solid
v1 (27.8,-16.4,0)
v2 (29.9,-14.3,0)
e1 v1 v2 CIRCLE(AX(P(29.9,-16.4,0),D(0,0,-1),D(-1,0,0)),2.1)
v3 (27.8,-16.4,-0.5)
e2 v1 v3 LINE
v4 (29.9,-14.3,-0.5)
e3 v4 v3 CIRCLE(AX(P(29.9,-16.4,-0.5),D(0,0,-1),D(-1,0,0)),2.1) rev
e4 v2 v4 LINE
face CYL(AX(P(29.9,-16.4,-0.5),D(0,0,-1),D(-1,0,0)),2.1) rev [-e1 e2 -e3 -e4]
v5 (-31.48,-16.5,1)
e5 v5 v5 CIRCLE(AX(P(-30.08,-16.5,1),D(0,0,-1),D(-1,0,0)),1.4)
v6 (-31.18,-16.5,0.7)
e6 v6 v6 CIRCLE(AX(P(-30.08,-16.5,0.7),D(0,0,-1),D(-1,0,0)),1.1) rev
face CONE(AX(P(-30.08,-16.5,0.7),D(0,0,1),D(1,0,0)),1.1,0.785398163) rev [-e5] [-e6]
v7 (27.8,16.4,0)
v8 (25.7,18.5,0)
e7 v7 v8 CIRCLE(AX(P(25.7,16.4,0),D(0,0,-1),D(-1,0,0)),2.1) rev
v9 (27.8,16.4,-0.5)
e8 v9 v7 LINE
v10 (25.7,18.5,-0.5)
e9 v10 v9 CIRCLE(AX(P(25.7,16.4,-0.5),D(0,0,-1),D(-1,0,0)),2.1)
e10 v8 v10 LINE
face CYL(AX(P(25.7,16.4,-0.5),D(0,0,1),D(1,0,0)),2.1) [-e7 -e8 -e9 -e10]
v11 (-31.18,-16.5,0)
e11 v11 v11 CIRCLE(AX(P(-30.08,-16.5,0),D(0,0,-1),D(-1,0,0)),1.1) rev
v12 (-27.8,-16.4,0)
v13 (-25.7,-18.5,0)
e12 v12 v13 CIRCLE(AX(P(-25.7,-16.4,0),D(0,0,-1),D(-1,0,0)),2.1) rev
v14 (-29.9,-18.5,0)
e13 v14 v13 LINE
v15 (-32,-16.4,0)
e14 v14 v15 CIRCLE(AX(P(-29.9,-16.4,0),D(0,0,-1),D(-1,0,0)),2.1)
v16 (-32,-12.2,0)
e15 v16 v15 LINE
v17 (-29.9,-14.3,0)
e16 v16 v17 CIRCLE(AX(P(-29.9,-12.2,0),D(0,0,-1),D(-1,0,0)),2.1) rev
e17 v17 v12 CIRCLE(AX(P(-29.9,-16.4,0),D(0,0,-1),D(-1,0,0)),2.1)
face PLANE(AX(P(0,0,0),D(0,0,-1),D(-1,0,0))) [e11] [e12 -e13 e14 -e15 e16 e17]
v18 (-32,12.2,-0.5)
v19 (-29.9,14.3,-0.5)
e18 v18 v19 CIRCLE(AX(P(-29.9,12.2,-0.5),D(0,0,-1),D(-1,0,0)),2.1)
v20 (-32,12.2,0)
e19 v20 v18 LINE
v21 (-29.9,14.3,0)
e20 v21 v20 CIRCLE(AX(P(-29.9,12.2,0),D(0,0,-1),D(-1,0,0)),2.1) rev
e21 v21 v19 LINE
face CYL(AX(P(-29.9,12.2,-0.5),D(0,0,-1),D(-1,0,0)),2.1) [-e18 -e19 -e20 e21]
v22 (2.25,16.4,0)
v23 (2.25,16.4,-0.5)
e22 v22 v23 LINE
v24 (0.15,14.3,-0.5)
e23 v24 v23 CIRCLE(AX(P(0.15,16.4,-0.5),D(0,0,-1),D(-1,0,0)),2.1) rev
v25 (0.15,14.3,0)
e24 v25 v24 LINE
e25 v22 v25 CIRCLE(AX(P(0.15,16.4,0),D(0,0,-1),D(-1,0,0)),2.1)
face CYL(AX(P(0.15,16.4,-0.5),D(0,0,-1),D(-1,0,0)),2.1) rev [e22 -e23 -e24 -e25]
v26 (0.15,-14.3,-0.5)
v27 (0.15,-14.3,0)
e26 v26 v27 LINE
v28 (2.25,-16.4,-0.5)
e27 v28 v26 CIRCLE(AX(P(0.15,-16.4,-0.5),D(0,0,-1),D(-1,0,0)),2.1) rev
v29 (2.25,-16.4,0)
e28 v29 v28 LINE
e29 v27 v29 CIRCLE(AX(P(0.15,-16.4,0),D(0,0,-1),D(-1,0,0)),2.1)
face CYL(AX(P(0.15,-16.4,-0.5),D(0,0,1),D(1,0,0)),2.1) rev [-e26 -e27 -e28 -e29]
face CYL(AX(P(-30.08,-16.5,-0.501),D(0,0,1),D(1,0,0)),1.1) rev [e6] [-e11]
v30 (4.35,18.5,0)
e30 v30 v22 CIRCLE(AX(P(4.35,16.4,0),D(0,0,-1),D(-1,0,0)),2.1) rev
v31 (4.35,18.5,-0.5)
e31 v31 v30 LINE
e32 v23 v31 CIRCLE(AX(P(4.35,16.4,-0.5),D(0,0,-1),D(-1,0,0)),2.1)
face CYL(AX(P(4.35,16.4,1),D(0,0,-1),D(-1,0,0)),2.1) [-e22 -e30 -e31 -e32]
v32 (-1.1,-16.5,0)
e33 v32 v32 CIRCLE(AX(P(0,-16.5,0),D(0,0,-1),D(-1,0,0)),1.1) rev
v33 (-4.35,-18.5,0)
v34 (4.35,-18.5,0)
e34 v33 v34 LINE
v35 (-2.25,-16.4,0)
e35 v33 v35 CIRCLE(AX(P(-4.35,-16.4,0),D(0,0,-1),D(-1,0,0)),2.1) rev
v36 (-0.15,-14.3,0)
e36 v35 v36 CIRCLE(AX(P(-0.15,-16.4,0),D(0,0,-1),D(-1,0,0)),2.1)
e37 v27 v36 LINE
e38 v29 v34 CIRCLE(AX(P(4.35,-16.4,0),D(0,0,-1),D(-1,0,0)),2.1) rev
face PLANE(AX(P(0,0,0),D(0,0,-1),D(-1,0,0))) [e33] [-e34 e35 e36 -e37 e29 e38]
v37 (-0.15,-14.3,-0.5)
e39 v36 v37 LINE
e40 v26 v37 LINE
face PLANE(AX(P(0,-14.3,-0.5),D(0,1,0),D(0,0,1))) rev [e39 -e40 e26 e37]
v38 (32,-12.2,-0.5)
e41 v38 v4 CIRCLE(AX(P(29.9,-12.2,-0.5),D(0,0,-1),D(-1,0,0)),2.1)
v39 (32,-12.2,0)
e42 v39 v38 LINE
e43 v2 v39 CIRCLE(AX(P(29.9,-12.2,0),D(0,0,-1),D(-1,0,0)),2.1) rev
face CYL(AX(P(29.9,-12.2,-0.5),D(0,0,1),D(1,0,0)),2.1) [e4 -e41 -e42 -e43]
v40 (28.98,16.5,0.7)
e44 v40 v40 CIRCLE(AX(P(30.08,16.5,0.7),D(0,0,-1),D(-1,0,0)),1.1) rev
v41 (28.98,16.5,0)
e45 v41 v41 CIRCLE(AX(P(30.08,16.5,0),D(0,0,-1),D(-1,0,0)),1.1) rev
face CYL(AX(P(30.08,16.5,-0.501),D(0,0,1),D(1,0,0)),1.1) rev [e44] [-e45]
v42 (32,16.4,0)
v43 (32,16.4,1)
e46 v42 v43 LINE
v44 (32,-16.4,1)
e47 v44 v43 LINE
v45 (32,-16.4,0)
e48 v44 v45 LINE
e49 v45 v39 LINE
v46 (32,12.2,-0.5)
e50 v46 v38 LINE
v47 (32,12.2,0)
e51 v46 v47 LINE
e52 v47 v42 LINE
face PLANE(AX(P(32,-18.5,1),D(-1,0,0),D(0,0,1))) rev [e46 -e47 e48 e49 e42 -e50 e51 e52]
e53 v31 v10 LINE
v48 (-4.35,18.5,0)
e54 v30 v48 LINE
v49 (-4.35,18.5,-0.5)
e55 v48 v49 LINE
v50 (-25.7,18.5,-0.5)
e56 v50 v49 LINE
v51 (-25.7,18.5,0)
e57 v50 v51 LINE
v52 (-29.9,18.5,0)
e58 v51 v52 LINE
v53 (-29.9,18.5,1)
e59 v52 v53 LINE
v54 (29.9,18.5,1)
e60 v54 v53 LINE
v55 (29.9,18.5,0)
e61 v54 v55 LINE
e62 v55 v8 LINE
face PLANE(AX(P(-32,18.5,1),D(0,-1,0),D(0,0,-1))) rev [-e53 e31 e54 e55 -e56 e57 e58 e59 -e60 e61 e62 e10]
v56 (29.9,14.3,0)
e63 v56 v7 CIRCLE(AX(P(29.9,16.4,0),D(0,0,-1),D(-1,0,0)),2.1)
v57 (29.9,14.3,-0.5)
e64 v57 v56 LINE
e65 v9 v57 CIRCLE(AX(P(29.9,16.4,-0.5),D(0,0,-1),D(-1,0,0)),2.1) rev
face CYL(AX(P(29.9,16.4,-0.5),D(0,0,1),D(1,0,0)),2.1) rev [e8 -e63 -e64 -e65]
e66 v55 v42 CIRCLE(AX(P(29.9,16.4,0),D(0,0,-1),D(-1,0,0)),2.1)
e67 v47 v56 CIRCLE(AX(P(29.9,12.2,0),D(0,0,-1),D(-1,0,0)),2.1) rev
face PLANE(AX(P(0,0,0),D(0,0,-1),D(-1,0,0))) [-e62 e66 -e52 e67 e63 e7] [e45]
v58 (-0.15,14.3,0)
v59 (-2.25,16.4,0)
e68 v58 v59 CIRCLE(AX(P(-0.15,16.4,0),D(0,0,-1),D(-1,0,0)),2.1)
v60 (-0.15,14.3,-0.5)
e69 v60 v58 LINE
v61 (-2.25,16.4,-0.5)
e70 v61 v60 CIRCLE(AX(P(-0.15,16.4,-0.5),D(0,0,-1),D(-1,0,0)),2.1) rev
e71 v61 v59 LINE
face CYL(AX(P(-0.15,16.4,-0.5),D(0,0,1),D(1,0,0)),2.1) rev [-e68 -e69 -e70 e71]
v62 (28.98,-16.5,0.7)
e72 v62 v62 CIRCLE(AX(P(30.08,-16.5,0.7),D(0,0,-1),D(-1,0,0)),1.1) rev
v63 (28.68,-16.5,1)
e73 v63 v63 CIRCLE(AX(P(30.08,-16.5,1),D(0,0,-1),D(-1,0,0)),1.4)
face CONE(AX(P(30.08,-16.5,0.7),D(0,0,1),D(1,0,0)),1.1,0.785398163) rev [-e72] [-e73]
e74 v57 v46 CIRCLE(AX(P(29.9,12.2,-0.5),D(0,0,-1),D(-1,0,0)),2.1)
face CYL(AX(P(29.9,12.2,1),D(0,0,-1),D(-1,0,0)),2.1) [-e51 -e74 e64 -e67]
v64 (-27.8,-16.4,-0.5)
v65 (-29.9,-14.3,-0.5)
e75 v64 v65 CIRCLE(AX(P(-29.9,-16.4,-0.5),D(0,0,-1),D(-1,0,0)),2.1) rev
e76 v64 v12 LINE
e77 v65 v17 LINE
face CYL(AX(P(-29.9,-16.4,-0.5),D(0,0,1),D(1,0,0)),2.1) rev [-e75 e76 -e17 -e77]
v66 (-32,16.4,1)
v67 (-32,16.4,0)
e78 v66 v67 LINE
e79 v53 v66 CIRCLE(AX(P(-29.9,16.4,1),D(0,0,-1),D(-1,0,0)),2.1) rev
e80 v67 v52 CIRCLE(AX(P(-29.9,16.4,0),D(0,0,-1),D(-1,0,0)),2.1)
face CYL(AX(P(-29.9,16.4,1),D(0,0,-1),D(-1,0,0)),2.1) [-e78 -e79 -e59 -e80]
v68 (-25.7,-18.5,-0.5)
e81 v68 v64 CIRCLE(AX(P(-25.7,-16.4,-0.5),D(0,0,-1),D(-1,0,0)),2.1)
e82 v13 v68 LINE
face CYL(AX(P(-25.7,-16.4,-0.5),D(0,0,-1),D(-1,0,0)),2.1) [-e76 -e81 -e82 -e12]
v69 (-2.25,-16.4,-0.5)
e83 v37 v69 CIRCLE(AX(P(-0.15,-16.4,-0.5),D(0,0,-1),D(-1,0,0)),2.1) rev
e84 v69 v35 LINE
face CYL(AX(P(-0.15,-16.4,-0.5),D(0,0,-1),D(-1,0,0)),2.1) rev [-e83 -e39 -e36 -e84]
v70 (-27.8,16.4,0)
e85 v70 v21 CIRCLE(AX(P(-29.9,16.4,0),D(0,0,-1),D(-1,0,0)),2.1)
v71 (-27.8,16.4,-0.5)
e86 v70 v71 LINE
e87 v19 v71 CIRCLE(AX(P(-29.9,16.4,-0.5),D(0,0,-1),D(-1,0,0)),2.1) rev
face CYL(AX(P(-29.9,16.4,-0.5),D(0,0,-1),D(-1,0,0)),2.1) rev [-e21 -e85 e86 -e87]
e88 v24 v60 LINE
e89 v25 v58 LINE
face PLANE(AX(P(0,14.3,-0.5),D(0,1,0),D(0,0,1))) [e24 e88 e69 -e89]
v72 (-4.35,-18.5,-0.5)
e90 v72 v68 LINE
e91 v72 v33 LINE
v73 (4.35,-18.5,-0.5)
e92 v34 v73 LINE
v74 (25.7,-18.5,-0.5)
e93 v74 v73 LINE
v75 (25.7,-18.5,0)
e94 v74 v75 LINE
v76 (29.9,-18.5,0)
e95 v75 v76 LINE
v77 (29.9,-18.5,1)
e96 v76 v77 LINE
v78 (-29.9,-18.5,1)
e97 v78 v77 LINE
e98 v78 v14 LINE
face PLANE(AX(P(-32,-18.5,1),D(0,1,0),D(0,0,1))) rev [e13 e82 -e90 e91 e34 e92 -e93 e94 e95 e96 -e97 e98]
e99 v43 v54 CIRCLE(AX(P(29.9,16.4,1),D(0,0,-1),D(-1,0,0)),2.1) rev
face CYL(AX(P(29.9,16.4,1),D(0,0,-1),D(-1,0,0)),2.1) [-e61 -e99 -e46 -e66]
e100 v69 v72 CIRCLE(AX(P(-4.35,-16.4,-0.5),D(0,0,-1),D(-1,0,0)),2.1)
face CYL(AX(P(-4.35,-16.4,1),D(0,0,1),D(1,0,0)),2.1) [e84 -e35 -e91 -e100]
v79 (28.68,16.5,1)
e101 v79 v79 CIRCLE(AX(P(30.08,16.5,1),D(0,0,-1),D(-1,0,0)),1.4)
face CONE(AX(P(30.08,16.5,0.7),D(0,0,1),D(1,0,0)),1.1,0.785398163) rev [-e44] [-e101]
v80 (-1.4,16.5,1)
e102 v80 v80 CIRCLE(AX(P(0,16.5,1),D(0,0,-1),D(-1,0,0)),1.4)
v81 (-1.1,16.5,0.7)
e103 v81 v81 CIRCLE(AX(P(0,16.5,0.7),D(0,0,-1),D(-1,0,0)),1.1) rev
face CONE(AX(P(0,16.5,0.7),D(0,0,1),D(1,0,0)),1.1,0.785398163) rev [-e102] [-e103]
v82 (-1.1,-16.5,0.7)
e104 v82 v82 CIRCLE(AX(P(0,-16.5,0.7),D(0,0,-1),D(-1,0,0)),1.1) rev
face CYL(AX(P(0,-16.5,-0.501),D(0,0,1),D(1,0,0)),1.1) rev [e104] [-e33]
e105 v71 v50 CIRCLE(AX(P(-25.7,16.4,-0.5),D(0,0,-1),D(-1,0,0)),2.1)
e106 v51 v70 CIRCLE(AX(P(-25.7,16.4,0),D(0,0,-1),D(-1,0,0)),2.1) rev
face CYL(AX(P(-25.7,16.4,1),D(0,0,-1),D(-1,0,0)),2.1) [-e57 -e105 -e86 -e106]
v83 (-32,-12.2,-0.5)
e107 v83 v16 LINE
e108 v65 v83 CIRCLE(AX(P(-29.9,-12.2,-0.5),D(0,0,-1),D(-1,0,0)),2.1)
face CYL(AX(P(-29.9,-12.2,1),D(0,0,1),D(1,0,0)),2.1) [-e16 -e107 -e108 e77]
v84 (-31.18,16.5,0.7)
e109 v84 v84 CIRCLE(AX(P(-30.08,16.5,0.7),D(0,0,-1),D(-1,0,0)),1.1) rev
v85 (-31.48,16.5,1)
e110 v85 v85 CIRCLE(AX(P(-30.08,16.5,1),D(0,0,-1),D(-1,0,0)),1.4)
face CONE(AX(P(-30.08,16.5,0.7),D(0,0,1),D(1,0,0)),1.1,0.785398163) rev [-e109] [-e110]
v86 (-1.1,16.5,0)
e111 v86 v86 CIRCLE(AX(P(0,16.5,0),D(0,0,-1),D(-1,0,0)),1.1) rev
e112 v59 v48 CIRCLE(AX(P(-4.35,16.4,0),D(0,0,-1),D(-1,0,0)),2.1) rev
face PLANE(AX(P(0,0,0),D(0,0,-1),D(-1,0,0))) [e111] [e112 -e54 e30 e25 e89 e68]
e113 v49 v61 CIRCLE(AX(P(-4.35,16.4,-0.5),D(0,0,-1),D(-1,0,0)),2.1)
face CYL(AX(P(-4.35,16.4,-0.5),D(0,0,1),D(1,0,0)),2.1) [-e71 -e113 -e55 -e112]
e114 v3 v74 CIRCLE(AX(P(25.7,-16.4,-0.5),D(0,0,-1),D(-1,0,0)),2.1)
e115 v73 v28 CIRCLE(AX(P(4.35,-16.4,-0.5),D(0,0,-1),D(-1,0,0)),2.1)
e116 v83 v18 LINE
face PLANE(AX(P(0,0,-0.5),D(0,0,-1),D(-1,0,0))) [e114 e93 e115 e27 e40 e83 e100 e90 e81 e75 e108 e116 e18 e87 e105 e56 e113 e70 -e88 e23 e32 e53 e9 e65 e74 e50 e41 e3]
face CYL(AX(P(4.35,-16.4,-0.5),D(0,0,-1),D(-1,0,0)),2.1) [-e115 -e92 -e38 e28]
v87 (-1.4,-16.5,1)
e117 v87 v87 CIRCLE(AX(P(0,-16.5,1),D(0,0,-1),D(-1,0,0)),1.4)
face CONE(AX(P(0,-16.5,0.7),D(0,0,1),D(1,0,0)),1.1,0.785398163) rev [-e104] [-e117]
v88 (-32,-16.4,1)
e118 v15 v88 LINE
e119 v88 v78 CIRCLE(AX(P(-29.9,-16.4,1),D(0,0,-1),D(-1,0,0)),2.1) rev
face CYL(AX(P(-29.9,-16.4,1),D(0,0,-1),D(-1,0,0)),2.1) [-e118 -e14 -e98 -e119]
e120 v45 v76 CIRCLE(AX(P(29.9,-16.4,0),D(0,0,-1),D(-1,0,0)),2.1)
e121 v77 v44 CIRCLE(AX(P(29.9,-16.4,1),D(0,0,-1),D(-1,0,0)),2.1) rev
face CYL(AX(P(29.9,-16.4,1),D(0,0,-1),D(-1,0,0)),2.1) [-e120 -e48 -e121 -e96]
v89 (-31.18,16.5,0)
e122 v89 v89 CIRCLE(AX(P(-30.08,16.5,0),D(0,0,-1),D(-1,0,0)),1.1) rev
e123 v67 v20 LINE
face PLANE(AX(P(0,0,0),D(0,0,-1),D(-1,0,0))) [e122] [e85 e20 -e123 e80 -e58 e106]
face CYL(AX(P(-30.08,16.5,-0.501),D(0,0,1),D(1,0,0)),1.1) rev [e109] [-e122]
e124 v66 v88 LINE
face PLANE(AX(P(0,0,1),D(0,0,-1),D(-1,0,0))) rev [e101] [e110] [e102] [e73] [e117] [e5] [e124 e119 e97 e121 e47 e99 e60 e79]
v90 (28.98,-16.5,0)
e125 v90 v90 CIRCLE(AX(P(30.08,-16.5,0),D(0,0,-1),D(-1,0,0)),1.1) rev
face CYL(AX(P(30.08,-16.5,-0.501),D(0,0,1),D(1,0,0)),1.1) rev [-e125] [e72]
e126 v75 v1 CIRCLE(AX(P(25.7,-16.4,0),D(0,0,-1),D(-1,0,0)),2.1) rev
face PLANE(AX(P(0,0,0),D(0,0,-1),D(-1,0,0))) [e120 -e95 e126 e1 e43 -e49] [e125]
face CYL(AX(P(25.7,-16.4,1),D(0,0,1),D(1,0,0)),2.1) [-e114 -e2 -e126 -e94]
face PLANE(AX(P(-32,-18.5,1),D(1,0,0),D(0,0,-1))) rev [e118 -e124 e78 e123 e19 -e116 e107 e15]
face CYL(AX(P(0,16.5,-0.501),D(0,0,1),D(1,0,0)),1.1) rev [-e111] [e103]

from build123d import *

# Parameters (mm, degrees)
SKETCH_1_W          = 64
SKETCH_1_H          = 37
EXTRUDE_1_DEPTH     = 1
SKETCH_2_W          = 4.2
SKETCH_2_H          = 28.6
SKETCH_2_W_2        = 25.55
SKETCH_2_H_2        = 4.2
SKETCH_2_W_3        = 4.5
EXTRUDE_2_DEPTH     = 0.5
FILLET_1_R          = 2.1
CUT_EXTRUDE_1_REACH = 38.993
SKETCH_3_R          = 1.1
CHAMFER_1_SIZE      = 0.3


with BuildPart() as part:
    # 스케치1 → 보스-돌출1 (new body)
    with BuildSketch(Plane.XY):
        Rectangle(SKETCH_1_W, SKETCH_1_H)
    extrude(amount=EXTRUDE_1_DEPTH)

    # 스케치2 → 보스-돌출2 (add)
    with BuildSketch(Plane(origin=(0, 0, 0), x_dir=(-1, 0, 0), z_dir=(0, 0, -1))):
        with Locations((-29.9, 0)):
            Rectangle(SKETCH_2_W, SKETCH_2_H)
        with Locations((-15.025, 0)):
            Rectangle(SKETCH_2_W_2, SKETCH_2_H)
        with Locations((-15.025, 16.4)):
            Rectangle(SKETCH_2_W_2, SKETCH_2_H_2)
        with Locations((-15.025, -16.4)):
            Rectangle(SKETCH_2_W_2, SKETCH_2_H_2)
        with Locations((15.025, 0)):
            Rectangle(SKETCH_2_W_2, SKETCH_2_H)
        with Locations((15.025, 16.4)):
            Rectangle(SKETCH_2_W_2, SKETCH_2_H_2)
        Rectangle(SKETCH_2_W_3, SKETCH_2_H)
        with Locations((29.9, 0)):
            Rectangle(SKETCH_2_W, SKETCH_2_H)
        with Locations((15.025, -16.4)):
            Rectangle(SKETCH_2_W_2, SKETCH_2_H_2)
    extrude(amount=EXTRUDE_2_DEPTH)

    # 필렛1
    # the kernel refuses this fillet: 2.1 mm, written as the material it adds along each edge
    with BuildSketch(Plane(origin=(27.8, -14.3, 5.25), x_dir=(0, -1, 0), z_dir=(0, 0, -1))) as fillet_1_piece_1_section:
        with BuildLine():
            CenterArc((FILLET_1_R, -FILLET_1_R), FILLET_1_R, 90, 90)
            Line((0, -FILLET_1_R), (0, 0))
            Line((0, 0), (FILLET_1_R, 0))
        make_face()
    fillet_1_piece_1 = extrude(amount=5.75, mode=Mode.PRIVATE)
    fillet_1_piece_1 = split(fillet_1_piece_1, bisect_by=Plane(origin=(28.269072672, -14.769072672, 1), z_dir=(0, 0, -1)), keep=Keep.TOP, mode=Mode.PRIVATE)
    add(fillet_1_piece_1)
    with BuildSketch(Plane(origin=(-2.25, -14.3, 5.25), x_dir=(0, -1, 0), z_dir=(0, 0, -1))) as fillet_1_piece_2_section:
        with BuildLine():
            CenterArc((FILLET_1_R, -FILLET_1_R), FILLET_1_R, 90, 90)
            Line((0, -FILLET_1_R), (0, 0))
            Line((0, 0), (FILLET_1_R, 0))
        make_face()
    fillet_1_piece_2 = extrude(amount=5.75, mode=Mode.PRIVATE)
    fillet_1_piece_2 = split(fillet_1_piece_2, bisect_by=Plane(origin=(-1.780927328, -14.769072672, 1), z_dir=(0, 0, -1)), keep=Keep.TOP, mode=Mode.PRIVATE)
    add(fillet_1_piece_2)
    with BuildSketch(Plane(origin=(2.25, -14.3, 5.25), x_dir=(-1, 0, 0), z_dir=(0, 0, -1))) as fillet_1_piece_3_section:
        with BuildLine():
            CenterArc((FILLET_1_R, -FILLET_1_R), FILLET_1_R, 90, 90)
            Line((0, -FILLET_1_R), (0, 0))
            Line((0, 0), (FILLET_1_R, 0))
        make_face()
    fillet_1_piece_3 = extrude(amount=5.75, mode=Mode.PRIVATE)
    fillet_1_piece_3 = split(fillet_1_piece_3, bisect_by=Plane(origin=(1.780927328, -14.769072672, 1), z_dir=(0, 0, -1)), keep=Keep.TOP, mode=Mode.PRIVATE)
    add(fillet_1_piece_3)
    with BuildSketch(Plane(origin=(-27.8, -14.3, 5.25), x_dir=(-1, 0, 0), z_dir=(0, 0, -1))) as fillet_1_piece_4_section:
        with BuildLine():
            CenterArc((FILLET_1_R, -FILLET_1_R), FILLET_1_R, 90, 90)
            Line((0, -FILLET_1_R), (0, 0))
            Line((0, 0), (FILLET_1_R, 0))
        make_face()
    fillet_1_piece_4 = extrude(amount=5.75, mode=Mode.PRIVATE)
    fillet_1_piece_4 = split(fillet_1_piece_4, bisect_by=Plane(origin=(-28.269072672, -14.769072672, 1), z_dir=(0, 0, -1)), keep=Keep.TOP, mode=Mode.PRIVATE)
    add(fillet_1_piece_4)
    with BuildSketch(Plane(origin=(27.8, 14.3, 0), x_dir=(1, 0, 0), z_dir=(0, 0, -1)), Plane(origin=(-27.8, 14.3, 0), x_dir=(0, 1, 0), z_dir=(0, 0, -1))) as fillet_1_piece_5:
        with BuildLine():
            CenterArc((FILLET_1_R, -FILLET_1_R), FILLET_1_R, 90, 90)
            Line((0, -FILLET_1_R), (0, 0))
            Line((0, 0), (FILLET_1_R, 0))
        make_face()
    extrude(amount=0.5)
    with BuildSketch(Plane(origin=(-2.25, 14.3, 0), x_dir=(0, 1, 0), z_dir=(0, 0, -1)), Plane(origin=(2.25, 14.3, 0), x_dir=(-1, 0, 0), z_dir=(0, 0, -1))) as fillet_1_piece_6:
        with BuildLine():
            CenterArc((FILLET_1_R, FILLET_1_R), FILLET_1_R, 180, 90)
            Line((0, FILLET_1_R), (0, 0))
            Line((0, 0), (FILLET_1_R, 0))
        make_face()
    extrude(amount=0.5)
    # the kernel refuses this fillet: 2.1 mm, written as the material it takes off along each edge
    with BuildSketch(Plane(origin=(32, -18.5, -5.25), x_dir=(-1, 0, 0), z_dir=(0, 0, 1)), Plane(origin=(32, 18.5, -5.25), x_dir=(0, -1, 0), z_dir=(0, 0, 1))) as fillet_1_2_piece_1:
        with BuildLine():
            CenterArc((FILLET_1_R, -FILLET_1_R), FILLET_1_R, 90, 90)
            Line((0, -FILLET_1_R), (0, 0))
            Line((0, 0), (FILLET_1_R, 0))
        make_face()
    extrude(amount=11.5, mode=Mode.SUBTRACT)
    with BuildSketch(Plane(origin=(32, -14.3, 0), x_dir=(0, 1, 0), z_dir=(0, 0, -1)), Plane(origin=(27.8, 18.5, 0), x_dir=(-1, 0, 0), z_dir=(0, 0, -1)), Plane(origin=(-2.25, 18.5, 0), x_dir=(-1, 0, 0), z_dir=(0, 0, -1)), Plane(origin=(2.25, -18.5, 0), x_dir=(1, 0, 0), z_dir=(0, 0, -1)), Plane(origin=(-27.8, -18.5, 0), x_dir=(1, 0, 0), z_dir=(0, 0, -1)), Plane(origin=(-32, 14.3, 0), x_dir=(0, -1, 0), z_dir=(0, 0, -1))) as fillet_1_2_piece_2:
        with BuildLine():
            CenterArc((FILLET_1_R, -FILLET_1_R), FILLET_1_R, 90, 90)
            Line((0, -FILLET_1_R), (0, 0))
            Line((0, 0), (FILLET_1_R, 0))
        make_face()
    extrude(amount=5.75, mode=Mode.SUBTRACT)
    with BuildSketch(Plane(origin=(-32, -14.3, 0), x_dir=(0, 1, 0), z_dir=(0, 0, -1)), Plane(origin=(27.8, -18.5, 0), x_dir=(-1, 0, 0), z_dir=(0, 0, -1)), Plane(origin=(-2.25, -18.5, 0), x_dir=(-1, 0, 0), z_dir=(0, 0, -1)), Plane(origin=(2.25, 18.5, 0), x_dir=(1, 0, 0), z_dir=(0, 0, -1)), Plane(origin=(-27.8, 18.5, 0), x_dir=(1, 0, 0), z_dir=(0, 0, -1)), Plane(origin=(32, 14.3, 0), x_dir=(0, -1, 0), z_dir=(0, 0, -1))) as fillet_1_2_piece_3:
        with BuildLine():
            CenterArc((FILLET_1_R, FILLET_1_R), FILLET_1_R, 180, 90)
            Line((0, FILLET_1_R), (0, 0))
            Line((0, 0), (FILLET_1_R, 0))
        make_face()
    extrude(amount=5.75, mode=Mode.SUBTRACT)
    with BuildSketch(Plane(origin=(-32, -18.5, -5.25), x_dir=(1, 0, 0), z_dir=(0, 0, 1)), Plane(origin=(-32, 18.5, -5.25), x_dir=(0, -1, 0), z_dir=(0, 0, 1))) as fillet_1_2_piece_4:
        with BuildLine():
            CenterArc((FILLET_1_R, FILLET_1_R), FILLET_1_R, 180, 90)
            Line((0, FILLET_1_R), (0, 0))
            Line((0, 0), (FILLET_1_R, 0))
        make_face()
    extrude(amount=11.5, mode=Mode.SUBTRACT)

    # 스케치3 → 컷-돌출1 (cut, up to next)
    with BuildSketch(Plane.XY.offset(1), mode=Mode.PRIVATE) as cut_extrude_1_sk1:
        with Locations((-30.08, 16.5)):
            Circle(SKETCH_3_R)
    cut_extrude_1_tool1 = extrude(cut_extrude_1_sk1.sketch, amount=-CUT_EXTRUDE_1_REACH, mode=Mode.PRIVATE) & part.part
    # 스케치3 → 컷-돌출1 (cut, up to next)
    with BuildSketch(Plane.XY.offset(1), mode=Mode.PRIVATE) as cut_extrude_1_sk2:
        with Locations((0, 16.5)):
            Circle(SKETCH_3_R)
    cut_extrude_1_tool2 = extrude(cut_extrude_1_sk2.sketch, amount=-CUT_EXTRUDE_1_REACH, mode=Mode.PRIVATE) & part.part
    # 스케치3 → 컷-돌출1 (cut, up to next)
    with BuildSketch(Plane.XY.offset(1), mode=Mode.PRIVATE) as cut_extrude_1_sk3:
        with Locations((30.08, 16.5)):
            Circle(SKETCH_3_R)
    cut_extrude_1_tool3 = extrude(cut_extrude_1_sk3.sketch, amount=-CUT_EXTRUDE_1_REACH, mode=Mode.PRIVATE) & part.part
    # 스케치3 → 컷-돌출1 (cut, up to next)
    with BuildSketch(Plane.XY.offset(1), mode=Mode.PRIVATE) as cut_extrude_1_sk4:
        with Locations((30.08, -16.5)):
            Circle(SKETCH_3_R)
    cut_extrude_1_tool4 = extrude(cut_extrude_1_sk4.sketch, amount=-CUT_EXTRUDE_1_REACH, mode=Mode.PRIVATE) & part.part
    # 스케치3 → 컷-돌출1 (cut, up to next)
    with BuildSketch(Plane.XY.offset(1), mode=Mode.PRIVATE) as cut_extrude_1_sk5:
        with Locations((-30.08, -16.5)):
            Circle(SKETCH_3_R)
    cut_extrude_1_tool5 = extrude(cut_extrude_1_sk5.sketch, amount=-CUT_EXTRUDE_1_REACH, mode=Mode.PRIVATE) & part.part
    # 스케치3 → 컷-돌출1 (cut, up to next)
    with BuildSketch(Plane.XY.offset(1), mode=Mode.PRIVATE) as cut_extrude_1_sk6:
        with Locations((0, -16.5)):
            Circle(SKETCH_3_R)
    cut_extrude_1_tool6 = extrude(cut_extrude_1_sk6.sketch, amount=-CUT_EXTRUDE_1_REACH, mode=Mode.PRIVATE) & part.part
    add(cut_extrude_1_tool1.solids().sort_by_distance((-30.08, 16.5, 1))[0], mode=Mode.SUBTRACT)
    add(cut_extrude_1_tool2.solids().sort_by_distance((0, 16.5, 1))[0], mode=Mode.SUBTRACT)
    add(cut_extrude_1_tool3.solids().sort_by_distance((30.08, 16.5, 1))[0], mode=Mode.SUBTRACT)
    add(cut_extrude_1_tool4.solids().sort_by_distance((30.08, -16.5, 1))[0], mode=Mode.SUBTRACT)
    add(cut_extrude_1_tool5.solids().sort_by_distance((-30.08, -16.5, 1))[0], mode=Mode.SUBTRACT)
    add(cut_extrude_1_tool6.solids().sort_by_distance((0, -16.5, 1))[0], mode=Mode.SUBTRACT)

    # 모따기1
    chamfer_1_edges = [part.edges().sort_by_distance(p)[0] for p in [
        (-1.1, 16.5, 1),
        (28.98, 16.5, 1),
        (28.98, -16.5, 1),
        (-31.18, -16.5, 1),
        (-1.1, -16.5, 1),
        (-31.18, 16.5, 1),
    ]]
    chamfer(chamfer_1_edges, length=CHAMFER_1_SIZE)


solid = part.part
